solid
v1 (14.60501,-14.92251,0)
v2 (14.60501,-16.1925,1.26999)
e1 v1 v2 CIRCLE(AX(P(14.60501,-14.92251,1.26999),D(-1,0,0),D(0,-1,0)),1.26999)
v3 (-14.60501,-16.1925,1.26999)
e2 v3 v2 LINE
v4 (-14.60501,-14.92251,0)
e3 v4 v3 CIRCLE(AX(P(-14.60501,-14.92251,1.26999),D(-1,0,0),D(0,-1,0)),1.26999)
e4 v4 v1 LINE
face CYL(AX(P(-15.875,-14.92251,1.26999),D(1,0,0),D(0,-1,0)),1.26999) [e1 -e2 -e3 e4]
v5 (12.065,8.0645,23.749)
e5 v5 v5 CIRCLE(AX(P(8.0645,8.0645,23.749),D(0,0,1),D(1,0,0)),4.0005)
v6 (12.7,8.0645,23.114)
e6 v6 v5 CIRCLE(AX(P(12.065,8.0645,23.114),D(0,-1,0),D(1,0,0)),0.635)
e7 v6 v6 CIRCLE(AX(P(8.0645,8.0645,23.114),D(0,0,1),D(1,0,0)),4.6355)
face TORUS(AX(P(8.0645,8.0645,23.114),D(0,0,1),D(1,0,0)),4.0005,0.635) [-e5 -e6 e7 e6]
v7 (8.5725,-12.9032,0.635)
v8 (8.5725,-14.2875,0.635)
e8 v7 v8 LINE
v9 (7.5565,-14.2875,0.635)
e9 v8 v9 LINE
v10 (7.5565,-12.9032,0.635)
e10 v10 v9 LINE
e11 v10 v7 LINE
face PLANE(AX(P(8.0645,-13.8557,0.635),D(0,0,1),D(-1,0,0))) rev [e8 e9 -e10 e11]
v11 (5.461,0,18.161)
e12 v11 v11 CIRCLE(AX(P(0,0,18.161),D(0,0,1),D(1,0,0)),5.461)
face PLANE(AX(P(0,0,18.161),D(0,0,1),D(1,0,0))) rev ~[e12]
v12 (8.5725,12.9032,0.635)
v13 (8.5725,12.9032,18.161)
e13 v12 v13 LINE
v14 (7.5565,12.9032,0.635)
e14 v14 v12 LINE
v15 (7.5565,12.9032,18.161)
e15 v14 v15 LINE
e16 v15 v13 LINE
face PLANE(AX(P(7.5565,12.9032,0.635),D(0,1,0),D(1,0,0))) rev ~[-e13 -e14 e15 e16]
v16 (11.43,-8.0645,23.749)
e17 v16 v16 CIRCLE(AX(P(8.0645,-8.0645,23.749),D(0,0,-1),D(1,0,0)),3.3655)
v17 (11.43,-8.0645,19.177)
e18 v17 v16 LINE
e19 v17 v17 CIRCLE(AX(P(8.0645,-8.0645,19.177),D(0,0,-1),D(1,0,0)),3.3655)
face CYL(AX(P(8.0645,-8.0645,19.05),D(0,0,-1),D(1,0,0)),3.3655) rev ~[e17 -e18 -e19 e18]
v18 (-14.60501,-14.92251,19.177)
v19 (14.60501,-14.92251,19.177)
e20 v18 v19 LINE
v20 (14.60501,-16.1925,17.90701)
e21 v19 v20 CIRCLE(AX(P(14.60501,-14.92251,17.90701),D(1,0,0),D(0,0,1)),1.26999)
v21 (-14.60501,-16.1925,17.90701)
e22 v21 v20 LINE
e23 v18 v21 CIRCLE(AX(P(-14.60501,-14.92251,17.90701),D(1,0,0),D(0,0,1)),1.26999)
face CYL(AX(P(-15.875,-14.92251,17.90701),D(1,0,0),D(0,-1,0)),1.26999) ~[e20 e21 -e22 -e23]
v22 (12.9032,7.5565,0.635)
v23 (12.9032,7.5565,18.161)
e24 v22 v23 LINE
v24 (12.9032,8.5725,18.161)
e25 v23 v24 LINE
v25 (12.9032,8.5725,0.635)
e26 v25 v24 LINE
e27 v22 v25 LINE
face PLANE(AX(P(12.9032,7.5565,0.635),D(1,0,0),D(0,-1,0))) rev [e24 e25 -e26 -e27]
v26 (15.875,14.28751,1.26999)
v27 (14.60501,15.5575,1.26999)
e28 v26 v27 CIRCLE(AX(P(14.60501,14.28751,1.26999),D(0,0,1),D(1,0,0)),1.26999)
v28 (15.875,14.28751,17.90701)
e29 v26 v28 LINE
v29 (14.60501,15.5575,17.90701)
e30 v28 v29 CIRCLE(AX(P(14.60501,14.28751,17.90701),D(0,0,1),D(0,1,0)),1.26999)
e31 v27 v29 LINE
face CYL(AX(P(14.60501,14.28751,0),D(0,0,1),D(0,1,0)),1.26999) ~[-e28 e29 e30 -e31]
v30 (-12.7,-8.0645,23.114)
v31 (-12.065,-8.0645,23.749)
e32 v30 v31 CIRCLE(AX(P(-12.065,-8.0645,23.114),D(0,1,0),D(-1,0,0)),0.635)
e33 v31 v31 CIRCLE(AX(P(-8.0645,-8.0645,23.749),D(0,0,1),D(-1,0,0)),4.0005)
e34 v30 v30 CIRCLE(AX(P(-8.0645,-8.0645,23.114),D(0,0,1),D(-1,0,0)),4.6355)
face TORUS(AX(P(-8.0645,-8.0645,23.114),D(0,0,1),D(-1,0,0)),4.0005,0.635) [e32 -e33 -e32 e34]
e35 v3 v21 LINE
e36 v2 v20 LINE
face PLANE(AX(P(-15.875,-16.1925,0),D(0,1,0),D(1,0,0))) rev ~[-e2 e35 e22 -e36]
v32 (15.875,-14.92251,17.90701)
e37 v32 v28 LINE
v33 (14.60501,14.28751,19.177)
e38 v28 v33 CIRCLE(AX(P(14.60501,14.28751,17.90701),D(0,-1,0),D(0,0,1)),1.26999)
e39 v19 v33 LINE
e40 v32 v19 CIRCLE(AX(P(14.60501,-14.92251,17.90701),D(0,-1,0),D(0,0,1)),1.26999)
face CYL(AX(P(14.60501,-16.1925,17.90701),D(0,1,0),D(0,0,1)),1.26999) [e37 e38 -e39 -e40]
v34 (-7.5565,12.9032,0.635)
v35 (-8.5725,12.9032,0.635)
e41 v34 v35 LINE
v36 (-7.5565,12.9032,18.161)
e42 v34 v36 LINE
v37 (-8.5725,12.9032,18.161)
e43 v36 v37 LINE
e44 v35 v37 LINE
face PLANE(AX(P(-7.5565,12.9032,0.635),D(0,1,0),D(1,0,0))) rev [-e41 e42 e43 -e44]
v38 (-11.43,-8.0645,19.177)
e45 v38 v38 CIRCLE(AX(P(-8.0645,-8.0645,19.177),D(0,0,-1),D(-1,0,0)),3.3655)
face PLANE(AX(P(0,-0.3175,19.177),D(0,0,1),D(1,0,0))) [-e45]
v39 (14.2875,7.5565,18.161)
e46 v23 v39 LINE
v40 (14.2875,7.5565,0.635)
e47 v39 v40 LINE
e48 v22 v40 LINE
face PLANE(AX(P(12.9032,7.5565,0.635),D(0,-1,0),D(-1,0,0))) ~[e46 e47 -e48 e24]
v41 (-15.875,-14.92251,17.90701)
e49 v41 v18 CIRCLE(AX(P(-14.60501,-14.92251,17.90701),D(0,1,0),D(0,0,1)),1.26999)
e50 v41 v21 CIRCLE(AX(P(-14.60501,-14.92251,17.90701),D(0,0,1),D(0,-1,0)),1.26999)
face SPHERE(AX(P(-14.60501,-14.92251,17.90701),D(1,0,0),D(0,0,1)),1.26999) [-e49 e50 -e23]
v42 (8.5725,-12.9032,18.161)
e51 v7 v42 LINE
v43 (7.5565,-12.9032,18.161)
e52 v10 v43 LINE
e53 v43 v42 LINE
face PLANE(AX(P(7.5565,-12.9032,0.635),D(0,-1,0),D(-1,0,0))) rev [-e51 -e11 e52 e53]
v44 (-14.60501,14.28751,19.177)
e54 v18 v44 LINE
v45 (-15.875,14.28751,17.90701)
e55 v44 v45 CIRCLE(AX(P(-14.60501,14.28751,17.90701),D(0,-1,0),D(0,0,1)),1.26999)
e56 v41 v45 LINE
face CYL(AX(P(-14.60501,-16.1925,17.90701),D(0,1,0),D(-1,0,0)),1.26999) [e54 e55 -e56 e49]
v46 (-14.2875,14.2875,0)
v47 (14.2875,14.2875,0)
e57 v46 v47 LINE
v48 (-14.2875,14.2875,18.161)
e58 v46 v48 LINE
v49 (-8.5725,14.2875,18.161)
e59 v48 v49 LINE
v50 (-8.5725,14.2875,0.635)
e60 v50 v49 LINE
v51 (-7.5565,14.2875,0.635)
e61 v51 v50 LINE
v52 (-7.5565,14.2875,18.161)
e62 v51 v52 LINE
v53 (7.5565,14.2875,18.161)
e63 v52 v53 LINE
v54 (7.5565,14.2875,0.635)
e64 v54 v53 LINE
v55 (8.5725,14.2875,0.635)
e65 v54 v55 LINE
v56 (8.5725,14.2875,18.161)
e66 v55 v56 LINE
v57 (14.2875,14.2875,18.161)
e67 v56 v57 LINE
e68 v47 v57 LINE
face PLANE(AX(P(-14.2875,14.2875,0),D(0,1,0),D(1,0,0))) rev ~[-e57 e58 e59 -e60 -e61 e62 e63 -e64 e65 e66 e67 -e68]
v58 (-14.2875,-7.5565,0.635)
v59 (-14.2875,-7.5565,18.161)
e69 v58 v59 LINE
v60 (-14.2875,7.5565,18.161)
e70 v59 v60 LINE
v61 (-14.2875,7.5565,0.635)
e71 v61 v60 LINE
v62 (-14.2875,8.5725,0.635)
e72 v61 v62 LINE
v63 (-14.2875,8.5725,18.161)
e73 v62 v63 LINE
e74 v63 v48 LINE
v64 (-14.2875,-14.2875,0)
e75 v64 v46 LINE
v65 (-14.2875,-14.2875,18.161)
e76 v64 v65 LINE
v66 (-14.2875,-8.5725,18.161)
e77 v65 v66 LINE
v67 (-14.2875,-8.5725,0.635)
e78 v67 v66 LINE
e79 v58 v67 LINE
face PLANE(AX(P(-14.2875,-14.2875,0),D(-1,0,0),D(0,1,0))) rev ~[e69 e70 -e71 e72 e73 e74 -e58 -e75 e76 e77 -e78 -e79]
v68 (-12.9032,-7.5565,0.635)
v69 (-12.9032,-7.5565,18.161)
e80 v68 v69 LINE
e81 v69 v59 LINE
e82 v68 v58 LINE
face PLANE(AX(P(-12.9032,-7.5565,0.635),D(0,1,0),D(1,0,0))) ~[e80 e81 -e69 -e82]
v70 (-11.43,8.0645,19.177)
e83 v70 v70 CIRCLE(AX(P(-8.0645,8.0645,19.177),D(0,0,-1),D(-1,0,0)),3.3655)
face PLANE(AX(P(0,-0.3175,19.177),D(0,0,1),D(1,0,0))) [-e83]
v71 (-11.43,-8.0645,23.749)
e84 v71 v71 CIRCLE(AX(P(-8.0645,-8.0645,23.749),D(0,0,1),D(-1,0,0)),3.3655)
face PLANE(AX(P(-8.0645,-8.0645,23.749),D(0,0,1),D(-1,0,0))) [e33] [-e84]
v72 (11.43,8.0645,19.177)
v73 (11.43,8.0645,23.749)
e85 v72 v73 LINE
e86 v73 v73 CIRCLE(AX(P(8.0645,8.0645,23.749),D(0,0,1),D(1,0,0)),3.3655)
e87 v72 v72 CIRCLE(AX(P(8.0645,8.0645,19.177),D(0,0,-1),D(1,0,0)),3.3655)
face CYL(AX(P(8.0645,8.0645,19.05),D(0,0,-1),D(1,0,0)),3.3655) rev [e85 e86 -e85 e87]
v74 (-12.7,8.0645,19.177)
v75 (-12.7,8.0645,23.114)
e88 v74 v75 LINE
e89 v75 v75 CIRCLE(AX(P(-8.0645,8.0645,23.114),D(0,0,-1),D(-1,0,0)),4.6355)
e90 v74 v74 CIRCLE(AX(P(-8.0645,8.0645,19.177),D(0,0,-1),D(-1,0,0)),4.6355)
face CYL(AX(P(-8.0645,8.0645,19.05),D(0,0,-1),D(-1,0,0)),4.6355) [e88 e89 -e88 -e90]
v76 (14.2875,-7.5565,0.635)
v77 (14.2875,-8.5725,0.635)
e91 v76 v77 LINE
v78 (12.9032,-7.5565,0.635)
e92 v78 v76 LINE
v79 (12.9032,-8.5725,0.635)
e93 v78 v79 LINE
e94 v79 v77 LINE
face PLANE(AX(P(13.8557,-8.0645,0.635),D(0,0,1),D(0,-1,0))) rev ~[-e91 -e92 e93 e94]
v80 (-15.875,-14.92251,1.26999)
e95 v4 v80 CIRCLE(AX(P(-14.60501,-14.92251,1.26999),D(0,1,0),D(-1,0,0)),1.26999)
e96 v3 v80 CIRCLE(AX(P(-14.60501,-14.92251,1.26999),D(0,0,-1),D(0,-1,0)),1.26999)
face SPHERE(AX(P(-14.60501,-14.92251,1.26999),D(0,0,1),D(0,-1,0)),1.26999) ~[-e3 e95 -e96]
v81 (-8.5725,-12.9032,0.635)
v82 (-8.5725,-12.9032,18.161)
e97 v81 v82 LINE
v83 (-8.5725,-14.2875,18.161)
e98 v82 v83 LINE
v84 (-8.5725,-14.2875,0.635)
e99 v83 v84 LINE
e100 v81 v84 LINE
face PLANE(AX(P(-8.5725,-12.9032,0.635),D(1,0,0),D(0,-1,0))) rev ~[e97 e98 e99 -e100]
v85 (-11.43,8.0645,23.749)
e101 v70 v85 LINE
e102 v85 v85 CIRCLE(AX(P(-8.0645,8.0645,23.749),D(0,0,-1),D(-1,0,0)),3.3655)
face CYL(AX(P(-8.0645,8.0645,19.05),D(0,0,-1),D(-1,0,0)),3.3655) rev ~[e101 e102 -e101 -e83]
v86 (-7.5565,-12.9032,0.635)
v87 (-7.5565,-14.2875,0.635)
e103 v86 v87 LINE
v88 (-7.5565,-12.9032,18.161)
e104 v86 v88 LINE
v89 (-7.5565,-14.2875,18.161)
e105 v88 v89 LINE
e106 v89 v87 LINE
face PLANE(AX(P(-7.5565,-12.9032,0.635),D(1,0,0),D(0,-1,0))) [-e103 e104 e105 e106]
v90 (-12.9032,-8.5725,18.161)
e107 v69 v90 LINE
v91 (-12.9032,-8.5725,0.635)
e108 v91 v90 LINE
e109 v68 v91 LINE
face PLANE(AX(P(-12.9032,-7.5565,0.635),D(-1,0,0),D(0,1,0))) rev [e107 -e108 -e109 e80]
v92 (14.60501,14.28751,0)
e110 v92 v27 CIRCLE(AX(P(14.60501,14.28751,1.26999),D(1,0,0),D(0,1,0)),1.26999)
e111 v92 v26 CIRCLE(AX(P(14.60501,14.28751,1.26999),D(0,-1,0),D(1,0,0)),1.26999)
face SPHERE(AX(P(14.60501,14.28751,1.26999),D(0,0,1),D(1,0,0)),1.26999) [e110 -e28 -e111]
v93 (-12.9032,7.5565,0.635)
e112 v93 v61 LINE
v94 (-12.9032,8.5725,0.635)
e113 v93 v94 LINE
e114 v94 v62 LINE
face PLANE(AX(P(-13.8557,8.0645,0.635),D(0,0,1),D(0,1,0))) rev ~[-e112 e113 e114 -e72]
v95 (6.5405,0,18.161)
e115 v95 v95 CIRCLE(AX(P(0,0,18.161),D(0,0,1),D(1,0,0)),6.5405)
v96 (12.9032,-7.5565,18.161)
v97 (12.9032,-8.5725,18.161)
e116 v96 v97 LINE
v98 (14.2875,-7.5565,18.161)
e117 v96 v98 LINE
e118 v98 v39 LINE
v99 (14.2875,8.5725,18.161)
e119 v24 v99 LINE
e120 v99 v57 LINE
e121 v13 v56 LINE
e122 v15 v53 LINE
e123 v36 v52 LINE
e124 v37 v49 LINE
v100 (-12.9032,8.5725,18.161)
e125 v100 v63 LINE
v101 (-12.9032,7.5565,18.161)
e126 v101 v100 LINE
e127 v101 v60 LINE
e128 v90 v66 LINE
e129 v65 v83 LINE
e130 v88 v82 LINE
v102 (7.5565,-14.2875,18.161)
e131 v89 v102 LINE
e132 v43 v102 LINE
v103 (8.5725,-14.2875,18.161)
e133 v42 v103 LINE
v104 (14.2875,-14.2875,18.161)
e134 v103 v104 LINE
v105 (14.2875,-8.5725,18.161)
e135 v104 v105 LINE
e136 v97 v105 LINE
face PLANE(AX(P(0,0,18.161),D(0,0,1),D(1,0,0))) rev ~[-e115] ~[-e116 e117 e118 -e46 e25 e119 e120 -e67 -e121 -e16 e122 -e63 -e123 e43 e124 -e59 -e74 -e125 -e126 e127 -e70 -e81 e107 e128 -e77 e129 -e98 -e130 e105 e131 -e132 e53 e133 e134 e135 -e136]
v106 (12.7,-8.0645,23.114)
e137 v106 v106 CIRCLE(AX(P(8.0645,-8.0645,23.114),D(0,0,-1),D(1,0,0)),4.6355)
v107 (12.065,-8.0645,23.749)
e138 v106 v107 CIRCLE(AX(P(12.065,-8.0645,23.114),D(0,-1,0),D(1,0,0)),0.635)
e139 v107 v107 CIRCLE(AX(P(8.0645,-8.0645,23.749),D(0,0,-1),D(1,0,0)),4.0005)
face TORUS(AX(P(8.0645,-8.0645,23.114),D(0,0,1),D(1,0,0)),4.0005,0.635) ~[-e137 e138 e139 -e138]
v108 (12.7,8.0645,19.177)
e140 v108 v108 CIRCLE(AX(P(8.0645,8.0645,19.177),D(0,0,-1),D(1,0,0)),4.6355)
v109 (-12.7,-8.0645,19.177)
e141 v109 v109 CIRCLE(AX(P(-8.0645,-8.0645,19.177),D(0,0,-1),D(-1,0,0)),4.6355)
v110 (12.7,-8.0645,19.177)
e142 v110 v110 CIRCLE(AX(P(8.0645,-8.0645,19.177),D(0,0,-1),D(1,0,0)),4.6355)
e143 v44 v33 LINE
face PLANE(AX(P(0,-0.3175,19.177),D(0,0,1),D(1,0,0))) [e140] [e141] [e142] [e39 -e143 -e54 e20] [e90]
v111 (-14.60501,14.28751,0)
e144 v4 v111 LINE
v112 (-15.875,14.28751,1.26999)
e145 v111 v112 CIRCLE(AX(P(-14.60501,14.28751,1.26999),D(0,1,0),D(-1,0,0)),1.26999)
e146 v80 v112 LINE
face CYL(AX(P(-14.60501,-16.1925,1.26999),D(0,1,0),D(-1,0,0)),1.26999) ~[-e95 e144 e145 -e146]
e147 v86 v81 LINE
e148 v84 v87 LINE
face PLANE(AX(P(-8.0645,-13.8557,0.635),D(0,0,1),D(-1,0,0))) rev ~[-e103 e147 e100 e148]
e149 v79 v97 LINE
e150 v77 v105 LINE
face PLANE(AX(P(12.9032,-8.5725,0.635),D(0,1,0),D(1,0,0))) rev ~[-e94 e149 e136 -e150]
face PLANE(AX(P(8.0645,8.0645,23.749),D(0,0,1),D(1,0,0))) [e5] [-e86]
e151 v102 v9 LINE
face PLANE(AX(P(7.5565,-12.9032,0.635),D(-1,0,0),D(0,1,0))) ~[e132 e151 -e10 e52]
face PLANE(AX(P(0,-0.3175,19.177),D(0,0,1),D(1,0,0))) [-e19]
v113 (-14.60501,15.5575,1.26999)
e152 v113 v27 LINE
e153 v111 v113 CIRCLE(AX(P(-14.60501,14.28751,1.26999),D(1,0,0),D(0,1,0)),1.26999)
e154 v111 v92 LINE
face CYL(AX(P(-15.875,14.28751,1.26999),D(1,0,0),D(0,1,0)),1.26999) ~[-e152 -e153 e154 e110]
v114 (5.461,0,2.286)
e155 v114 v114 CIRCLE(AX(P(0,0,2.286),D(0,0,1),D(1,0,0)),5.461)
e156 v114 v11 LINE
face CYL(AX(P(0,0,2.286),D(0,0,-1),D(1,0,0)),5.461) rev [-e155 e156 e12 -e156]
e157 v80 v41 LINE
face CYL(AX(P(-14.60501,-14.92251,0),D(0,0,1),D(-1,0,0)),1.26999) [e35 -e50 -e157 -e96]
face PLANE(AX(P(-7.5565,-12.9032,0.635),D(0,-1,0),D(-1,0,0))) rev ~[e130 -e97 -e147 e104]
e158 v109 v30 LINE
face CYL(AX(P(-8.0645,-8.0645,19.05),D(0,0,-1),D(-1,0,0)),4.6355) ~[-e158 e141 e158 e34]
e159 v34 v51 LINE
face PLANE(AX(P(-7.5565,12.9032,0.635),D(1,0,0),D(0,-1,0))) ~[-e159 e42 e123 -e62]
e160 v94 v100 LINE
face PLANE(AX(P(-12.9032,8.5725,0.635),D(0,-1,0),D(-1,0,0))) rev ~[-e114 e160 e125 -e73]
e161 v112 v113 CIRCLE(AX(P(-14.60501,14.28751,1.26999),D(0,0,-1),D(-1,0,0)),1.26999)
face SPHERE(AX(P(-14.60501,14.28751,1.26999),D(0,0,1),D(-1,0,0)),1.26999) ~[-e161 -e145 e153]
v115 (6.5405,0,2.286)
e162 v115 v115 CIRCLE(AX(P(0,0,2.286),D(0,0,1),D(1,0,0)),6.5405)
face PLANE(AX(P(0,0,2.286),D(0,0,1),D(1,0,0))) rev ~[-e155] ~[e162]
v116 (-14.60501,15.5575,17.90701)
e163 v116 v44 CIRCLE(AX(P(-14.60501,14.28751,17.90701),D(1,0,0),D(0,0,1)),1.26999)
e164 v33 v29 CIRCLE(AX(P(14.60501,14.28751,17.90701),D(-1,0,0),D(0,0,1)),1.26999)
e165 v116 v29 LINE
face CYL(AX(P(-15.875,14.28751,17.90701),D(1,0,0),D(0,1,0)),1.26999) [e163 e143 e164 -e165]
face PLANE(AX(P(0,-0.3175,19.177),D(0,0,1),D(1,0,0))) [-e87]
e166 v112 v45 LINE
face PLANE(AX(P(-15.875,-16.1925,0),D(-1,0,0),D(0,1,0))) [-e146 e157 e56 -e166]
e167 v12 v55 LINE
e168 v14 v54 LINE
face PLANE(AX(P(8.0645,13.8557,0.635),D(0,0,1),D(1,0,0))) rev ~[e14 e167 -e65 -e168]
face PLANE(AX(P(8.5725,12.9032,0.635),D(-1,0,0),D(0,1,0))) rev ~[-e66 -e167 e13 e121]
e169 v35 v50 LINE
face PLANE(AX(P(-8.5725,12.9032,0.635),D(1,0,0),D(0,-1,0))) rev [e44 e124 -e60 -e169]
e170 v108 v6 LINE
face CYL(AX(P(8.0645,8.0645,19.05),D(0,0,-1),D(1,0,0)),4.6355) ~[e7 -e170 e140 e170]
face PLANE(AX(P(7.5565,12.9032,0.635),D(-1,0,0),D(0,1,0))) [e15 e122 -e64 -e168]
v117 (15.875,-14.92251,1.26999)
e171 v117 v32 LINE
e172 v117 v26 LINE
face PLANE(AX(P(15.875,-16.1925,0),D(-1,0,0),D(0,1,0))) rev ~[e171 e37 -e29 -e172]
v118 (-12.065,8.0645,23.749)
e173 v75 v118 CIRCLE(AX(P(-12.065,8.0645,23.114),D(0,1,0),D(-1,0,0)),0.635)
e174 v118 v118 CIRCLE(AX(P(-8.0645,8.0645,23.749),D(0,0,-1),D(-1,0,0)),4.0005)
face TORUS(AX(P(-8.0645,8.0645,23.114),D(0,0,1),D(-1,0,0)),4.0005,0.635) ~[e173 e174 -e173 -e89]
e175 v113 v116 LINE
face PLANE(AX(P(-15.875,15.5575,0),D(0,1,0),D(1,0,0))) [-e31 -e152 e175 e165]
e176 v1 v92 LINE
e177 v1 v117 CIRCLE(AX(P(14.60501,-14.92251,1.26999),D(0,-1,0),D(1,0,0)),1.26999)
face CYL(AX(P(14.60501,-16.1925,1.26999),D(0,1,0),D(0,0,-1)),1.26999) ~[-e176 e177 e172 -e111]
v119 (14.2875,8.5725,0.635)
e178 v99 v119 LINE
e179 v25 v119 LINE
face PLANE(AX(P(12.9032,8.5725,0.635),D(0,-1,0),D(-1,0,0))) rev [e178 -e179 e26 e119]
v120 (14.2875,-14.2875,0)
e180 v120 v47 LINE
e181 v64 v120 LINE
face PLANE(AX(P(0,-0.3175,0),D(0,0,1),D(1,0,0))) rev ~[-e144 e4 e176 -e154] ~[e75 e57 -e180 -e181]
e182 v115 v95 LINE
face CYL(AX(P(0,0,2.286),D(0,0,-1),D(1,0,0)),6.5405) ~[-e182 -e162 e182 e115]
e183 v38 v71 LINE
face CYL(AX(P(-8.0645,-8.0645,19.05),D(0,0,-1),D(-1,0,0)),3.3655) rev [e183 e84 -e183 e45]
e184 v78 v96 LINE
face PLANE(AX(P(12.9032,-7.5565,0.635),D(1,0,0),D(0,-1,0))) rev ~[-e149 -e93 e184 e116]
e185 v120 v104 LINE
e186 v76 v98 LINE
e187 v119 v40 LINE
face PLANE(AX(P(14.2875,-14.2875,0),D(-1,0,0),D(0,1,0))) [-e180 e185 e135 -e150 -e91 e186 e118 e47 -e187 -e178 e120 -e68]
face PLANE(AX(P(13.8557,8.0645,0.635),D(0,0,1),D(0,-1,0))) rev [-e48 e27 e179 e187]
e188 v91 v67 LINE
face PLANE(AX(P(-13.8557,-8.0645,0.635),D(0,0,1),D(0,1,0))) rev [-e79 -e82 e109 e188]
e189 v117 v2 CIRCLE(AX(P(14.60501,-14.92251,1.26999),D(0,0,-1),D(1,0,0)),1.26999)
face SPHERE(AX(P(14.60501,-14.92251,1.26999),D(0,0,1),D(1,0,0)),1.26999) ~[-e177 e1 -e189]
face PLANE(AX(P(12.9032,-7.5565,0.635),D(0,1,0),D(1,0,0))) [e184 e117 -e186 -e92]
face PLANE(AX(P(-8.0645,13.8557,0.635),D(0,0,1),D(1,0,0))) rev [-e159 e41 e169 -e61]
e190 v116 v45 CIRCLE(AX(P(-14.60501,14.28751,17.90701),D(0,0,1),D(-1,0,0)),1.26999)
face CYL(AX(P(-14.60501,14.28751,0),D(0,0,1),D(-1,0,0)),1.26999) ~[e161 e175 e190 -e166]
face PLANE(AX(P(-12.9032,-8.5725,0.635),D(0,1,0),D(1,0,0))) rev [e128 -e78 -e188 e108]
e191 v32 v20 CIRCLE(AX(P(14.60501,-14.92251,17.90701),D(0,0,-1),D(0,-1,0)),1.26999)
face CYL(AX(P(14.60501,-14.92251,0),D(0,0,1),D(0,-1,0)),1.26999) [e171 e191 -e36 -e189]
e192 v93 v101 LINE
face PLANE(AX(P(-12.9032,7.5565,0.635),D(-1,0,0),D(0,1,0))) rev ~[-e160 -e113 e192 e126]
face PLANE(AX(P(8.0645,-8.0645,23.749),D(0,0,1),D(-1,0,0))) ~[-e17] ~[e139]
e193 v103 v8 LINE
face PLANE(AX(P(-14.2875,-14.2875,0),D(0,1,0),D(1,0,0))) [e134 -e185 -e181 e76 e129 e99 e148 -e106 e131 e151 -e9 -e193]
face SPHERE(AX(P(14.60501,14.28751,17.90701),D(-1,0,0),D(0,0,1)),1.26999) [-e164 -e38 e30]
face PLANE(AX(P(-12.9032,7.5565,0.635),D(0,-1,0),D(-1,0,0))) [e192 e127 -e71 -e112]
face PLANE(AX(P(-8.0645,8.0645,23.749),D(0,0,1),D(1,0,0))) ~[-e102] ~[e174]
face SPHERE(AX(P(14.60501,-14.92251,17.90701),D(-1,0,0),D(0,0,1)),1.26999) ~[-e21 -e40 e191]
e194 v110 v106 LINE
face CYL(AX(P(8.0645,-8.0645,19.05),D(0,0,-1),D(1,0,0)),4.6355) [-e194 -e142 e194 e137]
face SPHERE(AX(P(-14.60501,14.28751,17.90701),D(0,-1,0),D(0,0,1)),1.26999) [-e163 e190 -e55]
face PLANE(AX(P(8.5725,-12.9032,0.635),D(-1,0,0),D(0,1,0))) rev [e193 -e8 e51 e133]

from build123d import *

# Parameters (mm, degrees)
F0_W          = 31.75
F0_H          = 31.75
F5_DEPTH      = 19.177
F1_W          = 28.575
F1_H          = 28.575
F6_DEPTH      = 18.161
F6_DEPTH_BACK = 0.381
F2_R          = 6.5405
F7_DEPTH      = 15.875
F3_R          = 5.461
F8_DEPTH      = 15.875
F8_DEPTH_BACK = 0.635
F4_W          = 1.016
F4_H          = 1.905
F10_DEPTH     = 17.526
F15_ANGLE     = 90
F16_R         = 4.6355
F18_DEPTH     = 4.699
F17_R         = 3.3655
F19_DEPTH     = 4.699
F23_R         = 1.26999
F24_R         = 0.635
F24_2_R       = 0.635
F24_3_R       = 0.635
F24_4_R       = 0.635


# Not quite as in the source:
# - a fillet or chamfer is up to 0.001 mm smaller than in the source, because OpenCascade refuses the exact size


with BuildPart() as f5:
    # F0 (on Top) → F5 (new body)
    with BuildSketch(Plane.XY):
        with Locations((0, -0.3175)):
            Rectangle(F0_W, F0_H)
    extrude(amount=F5_DEPTH)

    # F1 (on face) → F6 (cut, two sides)
    with BuildSketch(Plane.XY) as f6_sk:
        Rectangle(F1_W, F1_H)
    extrude(amount=F6_DEPTH, mode=Mode.SUBTRACT)
    extrude(f6_sk.sketch, amount=-F6_DEPTH_BACK, mode=Mode.SUBTRACT)

    # F23 (radius 1.27 in the source; OpenCascade refuses exactly that, so slightly less here)
    f23_edges = [f5.edges().sort_by_distance(p)[0] for p in [
        (0, -16.1925, 19.177),
        (-15.875, -0.3175, 19.177),
        (0, 15.5575, 19.177),
        (15.875, -0.3175, 19.177),
        (-15.875, -16.1925, 9.5885),
        (15.875, -16.1925, 9.5885),
        (-15.875, 15.5575, 9.5885),
        (15.875, 15.5575, 9.5885),
        (15.875, -0.3175, 0),
        (0, -16.1925, 0),
        (-15.875, -0.3175, 0),
        (0, 15.5575, 0),
    ]]
    fillet(f23_edges, radius=F23_R)


with BuildPart() as f7:
    # F2 (on face) → F7 (new body)
    with BuildSketch(Plane.XY):
        Circle(F2_R)
    extrude(amount=F7_DEPTH)

    # F3 (on face) → F8 (cut, two sides)
    with BuildSketch(Plane.XY) as f8_sk:
        Circle(F3_R)
    extrude(amount=F8_DEPTH, mode=Mode.SUBTRACT)
    extrude(f8_sk.sketch, amount=-F8_DEPTH_BACK, mode=Mode.SUBTRACT)


with BuildPart() as f7_1:
    # F9: moved
    add(f7.part.moved(Location((0, 0, 2.286))))


with BuildPart() as f10:
    # F4 (on face) → F10 (new body)
    with BuildSketch(Plane.XY):
        Rectangle(F4_W, F4_H)
    extrude(amount=F10_DEPTH)


with BuildPart() as f10_1:
    # F11: moved
    add(f10.part.moved(Location((8.0645, 13.8557, 0.635))))


with BuildPart() as f12_1:
    # F12: instance of F10
    add(f10_1.part.mirror(Plane.XZ))


with BuildPart() as f13_1:
    # F13: instance of F12_1
    add(f12_1.part.mirror(Plane.YZ))


with BuildPart() as f13_2:
    # F13: instance of F10
    add(f10_1.part.mirror(Plane.YZ))


with BuildPart() as f15_1:
    # F15: copy of F12_1
    add(f12_1.part.rotate(Axis((0, 0, 4.273429513), (0, 0, -1)), F15_ANGLE))


with BuildPart() as f15_2:
    # F15: copy of F13_1
    add(f13_1.part.rotate(Axis((0, 0, 4.273429513), (0, 0, -1)), F15_ANGLE))


with BuildPart() as f15_3:
    # F15: copy of F10
    add(f10_1.part.rotate(Axis((0, 0, 4.273429513), (0, 0, -1)), F15_ANGLE))


with BuildPart() as f15_4:
    # F15: copy of F13_2
    add(f13_2.part.rotate(Axis((0, 0, 4.273429513), (0, 0, -1)), F15_ANGLE))


with BuildPart() as f18:
    # F16 (on Top) → F18 (new body)
    with BuildSketch(Plane.XY):
        Circle(F16_R)
    extrude(amount=F18_DEPTH)

    # F17 (on Top) → F19 (cut)
    with BuildSketch(Plane.XY):
        Circle(F17_R)
    extrude(amount=F19_DEPTH, mode=Mode.SUBTRACT)


with BuildPart() as f18_1:
    # F20: moved
    add(f18.part.moved(Location((8.0645, 8.0645, 19.05))))


with BuildPart() as f21_1:
    # F21: instance of F18
    add(f18_1.part.mirror(Plane.XZ))


with BuildPart() as f22_1:
    # F22: instance of F18
    add(f18_1.part.mirror(Plane.YZ))

    # F24
    f24_edges = [f22_1.edges().sort_by_distance(p)[0] for p in [
        (-3.429, 8.0645, 23.749),
    ]]
    fillet(f24_edges, radius=F24_R)


with BuildPart() as f22_2:
    # F22: instance of F21_1
    add(f21_1.part.mirror(Plane.YZ))

    # F24#4
    f24_4_edges = [f22_2.edges().sort_by_distance(p)[0] for p in [
        (-3.429, -8.0645, 23.749),
    ]]
    fillet(f24_4_edges, radius=F24_4_R)


with BuildPart() as f18_2:
    add(f18_1.part)

    # F24#2
    f24_2_edges = [f18_2.edges().sort_by_distance(p)[0] for p in [
        (3.429, 8.0645, 23.749),
    ]]
    fillet(f24_2_edges, radius=F24_2_R)


with BuildPart() as f21_1_1:
    add(f21_1.part)

    # F24#3
    f24_3_edges = [f21_1_1.edges().sort_by_distance(p)[0] for p in [
        (3.429, -8.0645, 23.749),
    ]]
    fillet(f24_3_edges, radius=F24_3_R)


with BuildPart() as f15_3_1:
    add(f15_3.part)

    # F25: union F21_1, F5, F7, F12_1, F13_2, F13_1, F15_1, F15_4, F15_2, F18, F22_1, F22_2, F10
    add(f21_1_1.part)
    add(f5.part)
    add(f7_1.part)
    add(f12_1.part)
    add(f13_2.part)
    add(f13_1.part)
    add(f15_1.part)
    add(f15_4.part)
    add(f15_2.part)
    add(f18_2.part)
    add(f22_1.part)
    add(f22_2.part)
    add(f10_1.part)


solid = f15_3_1.part
